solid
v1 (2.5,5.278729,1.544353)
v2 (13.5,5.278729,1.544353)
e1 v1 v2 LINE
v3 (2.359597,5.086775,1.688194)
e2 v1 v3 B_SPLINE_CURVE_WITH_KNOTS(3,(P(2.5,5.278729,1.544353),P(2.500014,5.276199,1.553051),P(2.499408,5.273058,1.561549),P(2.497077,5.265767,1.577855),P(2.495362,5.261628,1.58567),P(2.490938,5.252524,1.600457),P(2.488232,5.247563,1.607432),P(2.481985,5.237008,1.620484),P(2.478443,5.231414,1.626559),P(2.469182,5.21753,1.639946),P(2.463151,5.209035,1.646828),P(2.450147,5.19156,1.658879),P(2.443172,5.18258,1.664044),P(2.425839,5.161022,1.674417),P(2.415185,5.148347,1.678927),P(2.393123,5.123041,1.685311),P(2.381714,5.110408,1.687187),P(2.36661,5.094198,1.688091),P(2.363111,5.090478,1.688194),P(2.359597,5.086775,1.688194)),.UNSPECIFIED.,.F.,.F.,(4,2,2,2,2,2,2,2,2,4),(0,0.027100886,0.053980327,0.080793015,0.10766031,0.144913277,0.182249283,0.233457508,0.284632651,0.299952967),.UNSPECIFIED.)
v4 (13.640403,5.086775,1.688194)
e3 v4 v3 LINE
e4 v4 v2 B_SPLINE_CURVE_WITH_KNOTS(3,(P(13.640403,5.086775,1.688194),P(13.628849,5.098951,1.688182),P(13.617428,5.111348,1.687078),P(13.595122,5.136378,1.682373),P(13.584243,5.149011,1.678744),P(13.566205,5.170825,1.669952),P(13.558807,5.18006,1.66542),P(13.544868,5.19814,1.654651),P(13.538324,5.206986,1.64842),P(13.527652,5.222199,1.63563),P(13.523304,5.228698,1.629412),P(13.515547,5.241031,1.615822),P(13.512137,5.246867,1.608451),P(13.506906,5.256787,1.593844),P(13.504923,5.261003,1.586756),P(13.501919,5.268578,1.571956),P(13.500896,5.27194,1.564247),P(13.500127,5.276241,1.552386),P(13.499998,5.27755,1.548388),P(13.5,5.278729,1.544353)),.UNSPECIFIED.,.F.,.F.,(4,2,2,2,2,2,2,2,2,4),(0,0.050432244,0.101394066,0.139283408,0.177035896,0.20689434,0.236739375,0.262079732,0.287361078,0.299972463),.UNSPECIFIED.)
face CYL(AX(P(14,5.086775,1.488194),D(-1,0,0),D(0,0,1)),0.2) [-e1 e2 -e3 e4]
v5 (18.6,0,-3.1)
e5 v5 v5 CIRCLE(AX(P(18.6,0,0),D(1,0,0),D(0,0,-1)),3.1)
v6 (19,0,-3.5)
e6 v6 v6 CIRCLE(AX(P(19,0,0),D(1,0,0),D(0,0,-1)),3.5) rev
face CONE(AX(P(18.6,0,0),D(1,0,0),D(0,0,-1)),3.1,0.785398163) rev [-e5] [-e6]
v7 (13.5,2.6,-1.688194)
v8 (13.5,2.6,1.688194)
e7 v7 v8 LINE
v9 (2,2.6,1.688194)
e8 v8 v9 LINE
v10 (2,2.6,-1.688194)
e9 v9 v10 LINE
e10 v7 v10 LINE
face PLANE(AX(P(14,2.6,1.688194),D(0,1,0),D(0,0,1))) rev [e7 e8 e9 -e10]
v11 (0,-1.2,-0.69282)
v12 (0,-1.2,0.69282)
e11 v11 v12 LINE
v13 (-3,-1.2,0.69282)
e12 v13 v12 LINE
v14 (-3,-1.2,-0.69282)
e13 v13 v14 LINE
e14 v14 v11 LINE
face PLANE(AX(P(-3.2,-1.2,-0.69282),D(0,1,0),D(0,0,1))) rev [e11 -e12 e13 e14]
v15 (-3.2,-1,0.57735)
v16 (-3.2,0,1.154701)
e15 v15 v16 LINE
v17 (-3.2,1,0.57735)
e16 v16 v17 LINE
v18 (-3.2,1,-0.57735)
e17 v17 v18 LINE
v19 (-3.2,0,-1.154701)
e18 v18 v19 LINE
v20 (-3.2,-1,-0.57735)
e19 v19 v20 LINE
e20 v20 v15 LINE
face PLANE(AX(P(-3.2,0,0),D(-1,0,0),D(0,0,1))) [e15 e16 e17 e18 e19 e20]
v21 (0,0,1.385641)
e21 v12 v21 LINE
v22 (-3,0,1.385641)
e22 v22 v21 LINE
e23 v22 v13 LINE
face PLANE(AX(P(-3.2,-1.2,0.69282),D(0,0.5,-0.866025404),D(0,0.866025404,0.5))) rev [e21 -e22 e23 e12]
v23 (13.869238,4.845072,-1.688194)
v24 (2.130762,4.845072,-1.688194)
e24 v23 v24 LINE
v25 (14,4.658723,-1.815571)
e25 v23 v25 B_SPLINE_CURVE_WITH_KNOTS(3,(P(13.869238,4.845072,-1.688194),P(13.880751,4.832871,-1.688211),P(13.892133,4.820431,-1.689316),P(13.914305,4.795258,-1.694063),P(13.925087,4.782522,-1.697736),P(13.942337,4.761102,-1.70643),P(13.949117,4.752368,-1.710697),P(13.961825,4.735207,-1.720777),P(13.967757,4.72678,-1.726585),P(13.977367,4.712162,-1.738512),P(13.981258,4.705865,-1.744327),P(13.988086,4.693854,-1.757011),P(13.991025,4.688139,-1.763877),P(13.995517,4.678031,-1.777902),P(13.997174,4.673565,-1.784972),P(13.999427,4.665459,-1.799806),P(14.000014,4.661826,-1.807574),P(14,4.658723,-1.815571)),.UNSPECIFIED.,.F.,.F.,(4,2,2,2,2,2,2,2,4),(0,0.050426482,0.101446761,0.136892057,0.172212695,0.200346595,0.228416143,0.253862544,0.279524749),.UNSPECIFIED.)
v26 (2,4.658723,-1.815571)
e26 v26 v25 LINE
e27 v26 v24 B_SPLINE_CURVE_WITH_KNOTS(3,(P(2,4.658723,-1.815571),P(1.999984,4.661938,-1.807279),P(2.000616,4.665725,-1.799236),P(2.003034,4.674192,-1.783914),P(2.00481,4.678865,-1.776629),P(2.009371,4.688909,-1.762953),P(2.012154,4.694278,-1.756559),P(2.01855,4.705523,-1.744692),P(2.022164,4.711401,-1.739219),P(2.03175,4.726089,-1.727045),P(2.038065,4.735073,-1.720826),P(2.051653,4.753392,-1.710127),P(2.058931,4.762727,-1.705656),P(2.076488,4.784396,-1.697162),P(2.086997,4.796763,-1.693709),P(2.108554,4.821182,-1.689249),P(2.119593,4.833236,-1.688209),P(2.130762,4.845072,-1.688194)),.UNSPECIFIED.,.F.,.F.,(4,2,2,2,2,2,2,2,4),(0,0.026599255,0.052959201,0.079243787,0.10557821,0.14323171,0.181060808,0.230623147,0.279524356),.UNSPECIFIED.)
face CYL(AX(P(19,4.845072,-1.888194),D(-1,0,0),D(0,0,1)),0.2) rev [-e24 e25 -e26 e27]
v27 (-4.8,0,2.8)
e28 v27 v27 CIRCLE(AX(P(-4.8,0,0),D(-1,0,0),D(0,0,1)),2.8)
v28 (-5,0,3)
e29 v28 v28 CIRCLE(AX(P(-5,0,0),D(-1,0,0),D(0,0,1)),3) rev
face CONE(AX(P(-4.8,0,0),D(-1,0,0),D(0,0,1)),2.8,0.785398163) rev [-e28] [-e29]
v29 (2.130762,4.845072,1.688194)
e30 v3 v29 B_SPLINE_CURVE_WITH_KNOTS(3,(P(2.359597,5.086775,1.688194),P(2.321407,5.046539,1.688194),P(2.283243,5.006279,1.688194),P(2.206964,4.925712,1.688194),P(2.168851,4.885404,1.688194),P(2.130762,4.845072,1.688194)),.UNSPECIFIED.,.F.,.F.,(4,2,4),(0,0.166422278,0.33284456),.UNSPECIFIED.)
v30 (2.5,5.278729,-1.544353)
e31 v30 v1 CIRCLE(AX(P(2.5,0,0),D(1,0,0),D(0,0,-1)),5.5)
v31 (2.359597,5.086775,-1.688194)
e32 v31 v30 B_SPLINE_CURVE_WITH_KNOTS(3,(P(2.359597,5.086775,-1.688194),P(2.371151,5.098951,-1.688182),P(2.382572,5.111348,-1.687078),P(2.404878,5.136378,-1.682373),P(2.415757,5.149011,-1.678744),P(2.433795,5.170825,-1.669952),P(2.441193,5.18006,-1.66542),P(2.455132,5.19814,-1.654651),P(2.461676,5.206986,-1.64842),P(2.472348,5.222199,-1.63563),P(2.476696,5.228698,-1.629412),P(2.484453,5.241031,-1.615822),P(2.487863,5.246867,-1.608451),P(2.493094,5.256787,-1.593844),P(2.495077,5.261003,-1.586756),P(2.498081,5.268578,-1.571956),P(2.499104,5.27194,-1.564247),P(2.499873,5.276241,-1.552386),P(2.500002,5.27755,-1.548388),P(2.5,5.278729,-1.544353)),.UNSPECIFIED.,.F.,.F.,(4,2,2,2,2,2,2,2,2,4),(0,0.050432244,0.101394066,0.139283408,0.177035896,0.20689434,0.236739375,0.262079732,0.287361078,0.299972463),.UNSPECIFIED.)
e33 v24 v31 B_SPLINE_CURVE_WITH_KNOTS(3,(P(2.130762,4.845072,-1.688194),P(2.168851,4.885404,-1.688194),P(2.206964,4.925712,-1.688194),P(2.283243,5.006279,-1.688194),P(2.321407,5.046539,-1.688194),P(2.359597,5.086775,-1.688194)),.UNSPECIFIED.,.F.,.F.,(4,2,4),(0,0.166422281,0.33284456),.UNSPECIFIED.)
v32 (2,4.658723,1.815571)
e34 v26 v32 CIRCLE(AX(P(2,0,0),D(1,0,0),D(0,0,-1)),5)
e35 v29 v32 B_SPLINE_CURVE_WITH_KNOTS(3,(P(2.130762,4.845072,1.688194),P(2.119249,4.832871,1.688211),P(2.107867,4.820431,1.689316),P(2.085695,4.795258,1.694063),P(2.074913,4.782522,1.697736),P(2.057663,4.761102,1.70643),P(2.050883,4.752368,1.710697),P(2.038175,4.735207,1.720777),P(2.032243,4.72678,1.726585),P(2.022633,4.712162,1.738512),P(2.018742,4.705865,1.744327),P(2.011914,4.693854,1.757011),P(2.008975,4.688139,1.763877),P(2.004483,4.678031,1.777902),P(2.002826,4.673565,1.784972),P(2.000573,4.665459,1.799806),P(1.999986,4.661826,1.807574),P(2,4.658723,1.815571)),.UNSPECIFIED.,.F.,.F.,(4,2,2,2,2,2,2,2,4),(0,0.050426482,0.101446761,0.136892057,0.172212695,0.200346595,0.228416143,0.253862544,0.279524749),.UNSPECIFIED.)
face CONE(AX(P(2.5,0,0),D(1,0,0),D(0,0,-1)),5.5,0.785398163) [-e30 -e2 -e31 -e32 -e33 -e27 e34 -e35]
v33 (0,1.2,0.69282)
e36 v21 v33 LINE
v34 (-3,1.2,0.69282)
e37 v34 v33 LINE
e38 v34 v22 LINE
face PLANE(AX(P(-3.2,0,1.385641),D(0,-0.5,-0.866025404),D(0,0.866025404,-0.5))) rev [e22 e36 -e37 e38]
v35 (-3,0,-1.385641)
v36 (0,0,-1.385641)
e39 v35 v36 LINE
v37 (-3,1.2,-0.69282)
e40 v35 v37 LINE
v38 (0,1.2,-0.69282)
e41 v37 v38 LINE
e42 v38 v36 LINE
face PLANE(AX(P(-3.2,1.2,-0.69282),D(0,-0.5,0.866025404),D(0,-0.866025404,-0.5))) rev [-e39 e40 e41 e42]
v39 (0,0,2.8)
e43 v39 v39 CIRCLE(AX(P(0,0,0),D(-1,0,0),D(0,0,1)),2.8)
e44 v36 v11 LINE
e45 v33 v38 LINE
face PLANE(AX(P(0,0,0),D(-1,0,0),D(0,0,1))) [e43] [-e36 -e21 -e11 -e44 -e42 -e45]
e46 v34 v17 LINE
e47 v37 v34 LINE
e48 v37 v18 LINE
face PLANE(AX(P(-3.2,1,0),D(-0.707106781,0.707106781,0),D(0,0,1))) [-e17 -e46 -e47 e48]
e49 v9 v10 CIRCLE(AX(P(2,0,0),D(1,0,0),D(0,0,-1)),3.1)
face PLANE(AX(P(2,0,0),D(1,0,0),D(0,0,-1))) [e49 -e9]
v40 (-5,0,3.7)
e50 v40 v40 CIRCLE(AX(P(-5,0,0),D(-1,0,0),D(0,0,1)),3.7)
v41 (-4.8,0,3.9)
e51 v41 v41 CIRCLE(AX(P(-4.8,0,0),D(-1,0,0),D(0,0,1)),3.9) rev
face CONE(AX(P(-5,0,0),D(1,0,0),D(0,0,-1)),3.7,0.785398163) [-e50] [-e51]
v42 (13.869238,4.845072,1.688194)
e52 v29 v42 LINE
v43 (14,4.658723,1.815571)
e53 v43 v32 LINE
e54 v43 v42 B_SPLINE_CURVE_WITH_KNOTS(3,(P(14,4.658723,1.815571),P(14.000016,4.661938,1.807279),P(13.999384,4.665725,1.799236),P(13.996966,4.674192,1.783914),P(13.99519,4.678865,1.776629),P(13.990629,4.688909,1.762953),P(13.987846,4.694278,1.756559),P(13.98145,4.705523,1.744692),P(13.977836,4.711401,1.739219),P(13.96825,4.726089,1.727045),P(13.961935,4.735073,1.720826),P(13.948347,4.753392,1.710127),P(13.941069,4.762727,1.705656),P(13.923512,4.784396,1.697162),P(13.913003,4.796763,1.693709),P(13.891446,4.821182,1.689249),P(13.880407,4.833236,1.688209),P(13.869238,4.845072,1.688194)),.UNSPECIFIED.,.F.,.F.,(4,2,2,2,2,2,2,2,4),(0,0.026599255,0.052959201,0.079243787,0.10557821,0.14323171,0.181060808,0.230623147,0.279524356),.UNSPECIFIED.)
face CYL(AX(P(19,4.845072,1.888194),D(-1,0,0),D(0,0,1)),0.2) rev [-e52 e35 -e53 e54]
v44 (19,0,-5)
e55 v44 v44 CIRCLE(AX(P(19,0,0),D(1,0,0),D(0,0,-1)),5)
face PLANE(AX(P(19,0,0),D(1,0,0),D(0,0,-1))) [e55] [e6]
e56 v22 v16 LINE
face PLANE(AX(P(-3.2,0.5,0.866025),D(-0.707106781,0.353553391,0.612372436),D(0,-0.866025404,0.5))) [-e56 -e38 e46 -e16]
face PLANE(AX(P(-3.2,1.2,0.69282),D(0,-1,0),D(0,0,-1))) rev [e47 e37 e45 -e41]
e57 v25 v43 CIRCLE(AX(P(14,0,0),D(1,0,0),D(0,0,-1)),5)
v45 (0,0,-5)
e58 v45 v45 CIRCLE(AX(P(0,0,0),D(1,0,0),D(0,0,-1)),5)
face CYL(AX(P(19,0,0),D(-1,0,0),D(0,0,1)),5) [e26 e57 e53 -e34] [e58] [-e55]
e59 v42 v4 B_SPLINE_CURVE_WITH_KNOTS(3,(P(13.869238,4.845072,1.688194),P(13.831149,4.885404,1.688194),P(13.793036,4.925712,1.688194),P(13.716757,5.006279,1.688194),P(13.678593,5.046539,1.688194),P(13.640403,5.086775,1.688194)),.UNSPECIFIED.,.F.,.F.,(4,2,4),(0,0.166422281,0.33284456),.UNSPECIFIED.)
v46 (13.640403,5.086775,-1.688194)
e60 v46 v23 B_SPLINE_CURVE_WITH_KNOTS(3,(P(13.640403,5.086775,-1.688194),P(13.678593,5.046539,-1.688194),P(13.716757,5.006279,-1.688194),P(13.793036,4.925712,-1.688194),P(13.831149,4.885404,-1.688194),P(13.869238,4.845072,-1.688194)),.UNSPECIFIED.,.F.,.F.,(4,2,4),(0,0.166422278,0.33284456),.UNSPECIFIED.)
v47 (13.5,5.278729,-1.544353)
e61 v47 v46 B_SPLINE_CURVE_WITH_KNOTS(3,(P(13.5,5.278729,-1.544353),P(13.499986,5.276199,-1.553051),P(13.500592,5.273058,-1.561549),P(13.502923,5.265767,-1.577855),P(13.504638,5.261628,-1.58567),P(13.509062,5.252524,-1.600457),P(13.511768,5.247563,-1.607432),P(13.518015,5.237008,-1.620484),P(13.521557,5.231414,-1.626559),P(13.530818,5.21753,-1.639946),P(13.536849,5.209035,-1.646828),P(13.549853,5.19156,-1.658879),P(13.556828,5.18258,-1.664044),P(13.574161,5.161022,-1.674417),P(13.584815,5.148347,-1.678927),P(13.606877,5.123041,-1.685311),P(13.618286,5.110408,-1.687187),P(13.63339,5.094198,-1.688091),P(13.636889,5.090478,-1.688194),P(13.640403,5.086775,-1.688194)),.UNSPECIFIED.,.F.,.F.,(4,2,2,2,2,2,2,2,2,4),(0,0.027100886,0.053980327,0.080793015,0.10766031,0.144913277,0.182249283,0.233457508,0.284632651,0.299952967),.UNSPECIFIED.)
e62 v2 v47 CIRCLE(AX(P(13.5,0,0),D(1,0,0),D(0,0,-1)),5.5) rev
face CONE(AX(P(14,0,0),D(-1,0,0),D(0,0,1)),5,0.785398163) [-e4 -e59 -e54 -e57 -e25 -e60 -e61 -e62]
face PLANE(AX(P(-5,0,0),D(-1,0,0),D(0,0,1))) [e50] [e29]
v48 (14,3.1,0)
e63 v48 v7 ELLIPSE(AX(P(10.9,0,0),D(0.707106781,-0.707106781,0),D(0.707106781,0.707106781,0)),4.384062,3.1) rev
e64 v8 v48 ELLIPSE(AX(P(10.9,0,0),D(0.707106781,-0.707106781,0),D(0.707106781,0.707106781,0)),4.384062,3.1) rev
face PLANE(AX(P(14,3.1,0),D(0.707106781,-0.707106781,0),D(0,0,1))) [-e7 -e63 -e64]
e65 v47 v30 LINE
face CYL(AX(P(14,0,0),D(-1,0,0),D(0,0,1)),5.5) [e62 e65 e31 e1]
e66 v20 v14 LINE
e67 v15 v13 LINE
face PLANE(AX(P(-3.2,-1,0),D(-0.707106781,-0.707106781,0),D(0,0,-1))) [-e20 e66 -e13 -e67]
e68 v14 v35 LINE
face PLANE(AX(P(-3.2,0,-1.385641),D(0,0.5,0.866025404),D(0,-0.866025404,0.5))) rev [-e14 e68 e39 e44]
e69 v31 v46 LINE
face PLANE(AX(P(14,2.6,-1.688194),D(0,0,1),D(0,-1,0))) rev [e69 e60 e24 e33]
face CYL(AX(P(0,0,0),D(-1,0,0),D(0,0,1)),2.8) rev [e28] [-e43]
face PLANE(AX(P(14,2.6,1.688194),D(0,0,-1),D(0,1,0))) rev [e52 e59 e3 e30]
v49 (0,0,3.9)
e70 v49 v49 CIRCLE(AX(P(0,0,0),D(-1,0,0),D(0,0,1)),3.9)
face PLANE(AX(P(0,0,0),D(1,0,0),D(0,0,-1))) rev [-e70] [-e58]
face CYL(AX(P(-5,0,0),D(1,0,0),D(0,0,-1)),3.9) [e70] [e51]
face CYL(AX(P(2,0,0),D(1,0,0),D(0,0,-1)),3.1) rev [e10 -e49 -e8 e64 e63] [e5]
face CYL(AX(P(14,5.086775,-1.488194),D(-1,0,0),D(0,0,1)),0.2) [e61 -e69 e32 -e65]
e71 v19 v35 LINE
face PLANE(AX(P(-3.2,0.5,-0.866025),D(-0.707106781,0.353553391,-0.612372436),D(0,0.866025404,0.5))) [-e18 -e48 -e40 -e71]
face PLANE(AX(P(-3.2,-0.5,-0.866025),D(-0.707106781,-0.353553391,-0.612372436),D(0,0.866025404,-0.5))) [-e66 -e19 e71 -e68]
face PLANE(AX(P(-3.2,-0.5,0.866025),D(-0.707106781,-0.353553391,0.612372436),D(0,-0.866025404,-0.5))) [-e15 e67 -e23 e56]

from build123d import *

# Parameters (mm, degrees)
SKETCH_1_R          = 5
EXTRUDE_1_DEPTH     = 19
SKETCH_3_R          = 3.1
CUT_EXTRUDE_1_DEPTH = 17
EXTRUDE_2_DEPTH     = 12
SKETCH_8_R          = 3.9
EXTRUDE_4_DEPTH     = 5
SKETCH_9_R          = 2.8
CUT_EXTRUDE_2_DEPTH = 5
EXTRUDE_5_DEPTH     = 3.2
FILLET_1_R          = 0.2
CHAMFER_1_SIZE      = 0.5
CHAMFER_2_SIZE      = 0.4
CHAMFER_3_SIZE      = 0.2


with BuildPart() as part:
    # 草图1 → 凸台-拉伸1 (new body)
    with BuildSketch(Plane(origin=(0, 0, 0), x_dir=(0, 0, -1), z_dir=(1, 0, 0))):
        Circle(SKETCH_1_R)
    extrude(amount=EXTRUDE_1_DEPTH)

    # 草图3 → 切除-拉伸1 (cut)
    with BuildSketch(Plane(origin=(19, 0, 0), x_dir=(0, 0, -1), z_dir=(1, 0, 0))):
        Circle(SKETCH_3_R)
    extrude(amount=-CUT_EXTRUDE_1_DEPTH, mode=Mode.SUBTRACT)

    # 草图5 → 凸台-拉伸2 (add)
    with BuildSketch(Plane(origin=(2, 0, 0), x_dir=(0, 0, -1), z_dir=(1, 0, 0))):
        with BuildLine():
            Line((-1.688194302, 2.6), (1.688194302, 2.6))
            Line((1.688194302, 2.6), (1.688194302, 5.234500931))
            ThreePointArc((1.688194302, 5.234500931), (0, 5.5), (-1.688194302, 5.234500931))
            Line((-1.688194302, 5.234500931), (-1.688194302, 2.6))
        make_face()
    extrude(amount=EXTRUDE_2_DEPTH)

    # 草图8 → 凸台-拉伸4 (add)
    with BuildSketch(Plane.ZY):
        Circle(SKETCH_8_R)
    extrude(amount=EXTRUDE_4_DEPTH)

    # 草图9 → 切除-拉伸2 (cut)
    with BuildSketch(Plane.ZY.offset(5)):
        Circle(SKETCH_9_R)
    extrude(amount=-CUT_EXTRUDE_2_DEPTH, mode=Mode.SUBTRACT)

    # 草图10 → 凸台-拉伸5 (add)
    with BuildSketch(Plane.ZY):
        Polygon((0.692820323, 1.2), (-0.692820323, 1.2), (-1.385640646, 0), (-0.692820323, -1.2), (0.692820323, -1.2), (1.385640646, 0), align=None)
    extrude(amount=EXTRUDE_5_DEPTH)

    # 圆角1
    fillet_1_edges = [part.edges().sort_by_distance(p)[0] for p in [
        (8, 4.70637865, 1.688194302),
        (8, 5.234500931, 1.688194302),
        (8, 4.70637865, -1.688194302),
        (8, 5.234500931, -1.688194302),
    ]]
    fillet(fillet_1_edges, radius=FILLET_1_R)

    # 倒角1
    # the kernel refuses this chamfer: 0.5 mm, written as the material it takes off along each edge
    with BuildSketch(Plane(origin=(14, 0, 0), x_dir=(0, 0.8686030413593419, -0.4955085837211114), z_dir=(0, -0.4955085837211114, -0.8686030413593419))) as chamfer_1_piece_1:
        Polygon((5.5, -CHAMFER_1_SIZE), (5.5 - CHAMFER_1_SIZE, 0), (5.5, 0), align=None)
    revolve(axis=Axis((14, 0, 0), (1, 0, 0)), revolution_arc=59.40658503, mode=Mode.SUBTRACT)
    with BuildSketch(Plane(origin=(2, 0, 0), x_dir=(0, 0.8686030413593415, -0.4955085837211117), z_dir=(0, -0.4955085837211117, -0.8686030413593415))) as chamfer_1_piece_2:
        Polygon((5.5 - CHAMFER_1_SIZE, 0), (5.5, CHAMFER_1_SIZE), (5.5, 0), align=None)
    revolve(axis=Axis((2, 0, 0), (1, 0, 0)), revolution_arc=59.40658503, mode=Mode.SUBTRACT)
    with BuildSketch(Plane(origin=(14, 2.6, 2.974035796), x_dir=(0.027495876610585623, 0.9996219169112968, 0), z_dir=(0, 0, -1))) as chamfer_1_piece_3_section:
        Polygon((CHAMFER_1_SIZE * 0.999621916911, -CHAMFER_1_SIZE * 0.0274958766106), (-CHAMFER_1_SIZE * 0.0274958766106, -CHAMFER_1_SIZE * 0.999621916911), (0, 0), align=None)
    chamfer_1_piece_3 = extrude(amount=5.948071591, mode=Mode.PRIVATE)
    chamfer_1_piece_3 = chamfer_1_piece_3 & Plane(origin=(13.821912141, 0, 0), x_dir=(0, 0, -1), z_dir=(1, 0, 0)) * Cylinder(3.1, 14, mode=Mode.PRIVATE)
    add(chamfer_1_piece_3, mode=Mode.SUBTRACT)

    # 倒角2
    chamfer_2_edges = [part.edges().sort_by_distance(p)[0] for p in [
        (19, 0, 3.1),
    ]]
    chamfer(chamfer_2_edges, length=CHAMFER_2_SIZE)

    # 倒角3
    chamfer_3_edges = [part.edges().sort_by_distance(p)[0] for p in [
        (-5, 0, -3.9),
        (-5, 0, -2.8),
        (-3.2, 0.6, 1.039230485),
        (-3.2, 1.2, 0),
        (-3.2, 0.6, -1.039230485),
        (-3.2, -0.6, -1.039230485),
        (-3.2, -1.2, 0),
        (-3.2, -0.6, 1.039230485),
    ]]
    chamfer(chamfer_3_edges, length=CHAMFER_3_SIZE)


solid = part.part
